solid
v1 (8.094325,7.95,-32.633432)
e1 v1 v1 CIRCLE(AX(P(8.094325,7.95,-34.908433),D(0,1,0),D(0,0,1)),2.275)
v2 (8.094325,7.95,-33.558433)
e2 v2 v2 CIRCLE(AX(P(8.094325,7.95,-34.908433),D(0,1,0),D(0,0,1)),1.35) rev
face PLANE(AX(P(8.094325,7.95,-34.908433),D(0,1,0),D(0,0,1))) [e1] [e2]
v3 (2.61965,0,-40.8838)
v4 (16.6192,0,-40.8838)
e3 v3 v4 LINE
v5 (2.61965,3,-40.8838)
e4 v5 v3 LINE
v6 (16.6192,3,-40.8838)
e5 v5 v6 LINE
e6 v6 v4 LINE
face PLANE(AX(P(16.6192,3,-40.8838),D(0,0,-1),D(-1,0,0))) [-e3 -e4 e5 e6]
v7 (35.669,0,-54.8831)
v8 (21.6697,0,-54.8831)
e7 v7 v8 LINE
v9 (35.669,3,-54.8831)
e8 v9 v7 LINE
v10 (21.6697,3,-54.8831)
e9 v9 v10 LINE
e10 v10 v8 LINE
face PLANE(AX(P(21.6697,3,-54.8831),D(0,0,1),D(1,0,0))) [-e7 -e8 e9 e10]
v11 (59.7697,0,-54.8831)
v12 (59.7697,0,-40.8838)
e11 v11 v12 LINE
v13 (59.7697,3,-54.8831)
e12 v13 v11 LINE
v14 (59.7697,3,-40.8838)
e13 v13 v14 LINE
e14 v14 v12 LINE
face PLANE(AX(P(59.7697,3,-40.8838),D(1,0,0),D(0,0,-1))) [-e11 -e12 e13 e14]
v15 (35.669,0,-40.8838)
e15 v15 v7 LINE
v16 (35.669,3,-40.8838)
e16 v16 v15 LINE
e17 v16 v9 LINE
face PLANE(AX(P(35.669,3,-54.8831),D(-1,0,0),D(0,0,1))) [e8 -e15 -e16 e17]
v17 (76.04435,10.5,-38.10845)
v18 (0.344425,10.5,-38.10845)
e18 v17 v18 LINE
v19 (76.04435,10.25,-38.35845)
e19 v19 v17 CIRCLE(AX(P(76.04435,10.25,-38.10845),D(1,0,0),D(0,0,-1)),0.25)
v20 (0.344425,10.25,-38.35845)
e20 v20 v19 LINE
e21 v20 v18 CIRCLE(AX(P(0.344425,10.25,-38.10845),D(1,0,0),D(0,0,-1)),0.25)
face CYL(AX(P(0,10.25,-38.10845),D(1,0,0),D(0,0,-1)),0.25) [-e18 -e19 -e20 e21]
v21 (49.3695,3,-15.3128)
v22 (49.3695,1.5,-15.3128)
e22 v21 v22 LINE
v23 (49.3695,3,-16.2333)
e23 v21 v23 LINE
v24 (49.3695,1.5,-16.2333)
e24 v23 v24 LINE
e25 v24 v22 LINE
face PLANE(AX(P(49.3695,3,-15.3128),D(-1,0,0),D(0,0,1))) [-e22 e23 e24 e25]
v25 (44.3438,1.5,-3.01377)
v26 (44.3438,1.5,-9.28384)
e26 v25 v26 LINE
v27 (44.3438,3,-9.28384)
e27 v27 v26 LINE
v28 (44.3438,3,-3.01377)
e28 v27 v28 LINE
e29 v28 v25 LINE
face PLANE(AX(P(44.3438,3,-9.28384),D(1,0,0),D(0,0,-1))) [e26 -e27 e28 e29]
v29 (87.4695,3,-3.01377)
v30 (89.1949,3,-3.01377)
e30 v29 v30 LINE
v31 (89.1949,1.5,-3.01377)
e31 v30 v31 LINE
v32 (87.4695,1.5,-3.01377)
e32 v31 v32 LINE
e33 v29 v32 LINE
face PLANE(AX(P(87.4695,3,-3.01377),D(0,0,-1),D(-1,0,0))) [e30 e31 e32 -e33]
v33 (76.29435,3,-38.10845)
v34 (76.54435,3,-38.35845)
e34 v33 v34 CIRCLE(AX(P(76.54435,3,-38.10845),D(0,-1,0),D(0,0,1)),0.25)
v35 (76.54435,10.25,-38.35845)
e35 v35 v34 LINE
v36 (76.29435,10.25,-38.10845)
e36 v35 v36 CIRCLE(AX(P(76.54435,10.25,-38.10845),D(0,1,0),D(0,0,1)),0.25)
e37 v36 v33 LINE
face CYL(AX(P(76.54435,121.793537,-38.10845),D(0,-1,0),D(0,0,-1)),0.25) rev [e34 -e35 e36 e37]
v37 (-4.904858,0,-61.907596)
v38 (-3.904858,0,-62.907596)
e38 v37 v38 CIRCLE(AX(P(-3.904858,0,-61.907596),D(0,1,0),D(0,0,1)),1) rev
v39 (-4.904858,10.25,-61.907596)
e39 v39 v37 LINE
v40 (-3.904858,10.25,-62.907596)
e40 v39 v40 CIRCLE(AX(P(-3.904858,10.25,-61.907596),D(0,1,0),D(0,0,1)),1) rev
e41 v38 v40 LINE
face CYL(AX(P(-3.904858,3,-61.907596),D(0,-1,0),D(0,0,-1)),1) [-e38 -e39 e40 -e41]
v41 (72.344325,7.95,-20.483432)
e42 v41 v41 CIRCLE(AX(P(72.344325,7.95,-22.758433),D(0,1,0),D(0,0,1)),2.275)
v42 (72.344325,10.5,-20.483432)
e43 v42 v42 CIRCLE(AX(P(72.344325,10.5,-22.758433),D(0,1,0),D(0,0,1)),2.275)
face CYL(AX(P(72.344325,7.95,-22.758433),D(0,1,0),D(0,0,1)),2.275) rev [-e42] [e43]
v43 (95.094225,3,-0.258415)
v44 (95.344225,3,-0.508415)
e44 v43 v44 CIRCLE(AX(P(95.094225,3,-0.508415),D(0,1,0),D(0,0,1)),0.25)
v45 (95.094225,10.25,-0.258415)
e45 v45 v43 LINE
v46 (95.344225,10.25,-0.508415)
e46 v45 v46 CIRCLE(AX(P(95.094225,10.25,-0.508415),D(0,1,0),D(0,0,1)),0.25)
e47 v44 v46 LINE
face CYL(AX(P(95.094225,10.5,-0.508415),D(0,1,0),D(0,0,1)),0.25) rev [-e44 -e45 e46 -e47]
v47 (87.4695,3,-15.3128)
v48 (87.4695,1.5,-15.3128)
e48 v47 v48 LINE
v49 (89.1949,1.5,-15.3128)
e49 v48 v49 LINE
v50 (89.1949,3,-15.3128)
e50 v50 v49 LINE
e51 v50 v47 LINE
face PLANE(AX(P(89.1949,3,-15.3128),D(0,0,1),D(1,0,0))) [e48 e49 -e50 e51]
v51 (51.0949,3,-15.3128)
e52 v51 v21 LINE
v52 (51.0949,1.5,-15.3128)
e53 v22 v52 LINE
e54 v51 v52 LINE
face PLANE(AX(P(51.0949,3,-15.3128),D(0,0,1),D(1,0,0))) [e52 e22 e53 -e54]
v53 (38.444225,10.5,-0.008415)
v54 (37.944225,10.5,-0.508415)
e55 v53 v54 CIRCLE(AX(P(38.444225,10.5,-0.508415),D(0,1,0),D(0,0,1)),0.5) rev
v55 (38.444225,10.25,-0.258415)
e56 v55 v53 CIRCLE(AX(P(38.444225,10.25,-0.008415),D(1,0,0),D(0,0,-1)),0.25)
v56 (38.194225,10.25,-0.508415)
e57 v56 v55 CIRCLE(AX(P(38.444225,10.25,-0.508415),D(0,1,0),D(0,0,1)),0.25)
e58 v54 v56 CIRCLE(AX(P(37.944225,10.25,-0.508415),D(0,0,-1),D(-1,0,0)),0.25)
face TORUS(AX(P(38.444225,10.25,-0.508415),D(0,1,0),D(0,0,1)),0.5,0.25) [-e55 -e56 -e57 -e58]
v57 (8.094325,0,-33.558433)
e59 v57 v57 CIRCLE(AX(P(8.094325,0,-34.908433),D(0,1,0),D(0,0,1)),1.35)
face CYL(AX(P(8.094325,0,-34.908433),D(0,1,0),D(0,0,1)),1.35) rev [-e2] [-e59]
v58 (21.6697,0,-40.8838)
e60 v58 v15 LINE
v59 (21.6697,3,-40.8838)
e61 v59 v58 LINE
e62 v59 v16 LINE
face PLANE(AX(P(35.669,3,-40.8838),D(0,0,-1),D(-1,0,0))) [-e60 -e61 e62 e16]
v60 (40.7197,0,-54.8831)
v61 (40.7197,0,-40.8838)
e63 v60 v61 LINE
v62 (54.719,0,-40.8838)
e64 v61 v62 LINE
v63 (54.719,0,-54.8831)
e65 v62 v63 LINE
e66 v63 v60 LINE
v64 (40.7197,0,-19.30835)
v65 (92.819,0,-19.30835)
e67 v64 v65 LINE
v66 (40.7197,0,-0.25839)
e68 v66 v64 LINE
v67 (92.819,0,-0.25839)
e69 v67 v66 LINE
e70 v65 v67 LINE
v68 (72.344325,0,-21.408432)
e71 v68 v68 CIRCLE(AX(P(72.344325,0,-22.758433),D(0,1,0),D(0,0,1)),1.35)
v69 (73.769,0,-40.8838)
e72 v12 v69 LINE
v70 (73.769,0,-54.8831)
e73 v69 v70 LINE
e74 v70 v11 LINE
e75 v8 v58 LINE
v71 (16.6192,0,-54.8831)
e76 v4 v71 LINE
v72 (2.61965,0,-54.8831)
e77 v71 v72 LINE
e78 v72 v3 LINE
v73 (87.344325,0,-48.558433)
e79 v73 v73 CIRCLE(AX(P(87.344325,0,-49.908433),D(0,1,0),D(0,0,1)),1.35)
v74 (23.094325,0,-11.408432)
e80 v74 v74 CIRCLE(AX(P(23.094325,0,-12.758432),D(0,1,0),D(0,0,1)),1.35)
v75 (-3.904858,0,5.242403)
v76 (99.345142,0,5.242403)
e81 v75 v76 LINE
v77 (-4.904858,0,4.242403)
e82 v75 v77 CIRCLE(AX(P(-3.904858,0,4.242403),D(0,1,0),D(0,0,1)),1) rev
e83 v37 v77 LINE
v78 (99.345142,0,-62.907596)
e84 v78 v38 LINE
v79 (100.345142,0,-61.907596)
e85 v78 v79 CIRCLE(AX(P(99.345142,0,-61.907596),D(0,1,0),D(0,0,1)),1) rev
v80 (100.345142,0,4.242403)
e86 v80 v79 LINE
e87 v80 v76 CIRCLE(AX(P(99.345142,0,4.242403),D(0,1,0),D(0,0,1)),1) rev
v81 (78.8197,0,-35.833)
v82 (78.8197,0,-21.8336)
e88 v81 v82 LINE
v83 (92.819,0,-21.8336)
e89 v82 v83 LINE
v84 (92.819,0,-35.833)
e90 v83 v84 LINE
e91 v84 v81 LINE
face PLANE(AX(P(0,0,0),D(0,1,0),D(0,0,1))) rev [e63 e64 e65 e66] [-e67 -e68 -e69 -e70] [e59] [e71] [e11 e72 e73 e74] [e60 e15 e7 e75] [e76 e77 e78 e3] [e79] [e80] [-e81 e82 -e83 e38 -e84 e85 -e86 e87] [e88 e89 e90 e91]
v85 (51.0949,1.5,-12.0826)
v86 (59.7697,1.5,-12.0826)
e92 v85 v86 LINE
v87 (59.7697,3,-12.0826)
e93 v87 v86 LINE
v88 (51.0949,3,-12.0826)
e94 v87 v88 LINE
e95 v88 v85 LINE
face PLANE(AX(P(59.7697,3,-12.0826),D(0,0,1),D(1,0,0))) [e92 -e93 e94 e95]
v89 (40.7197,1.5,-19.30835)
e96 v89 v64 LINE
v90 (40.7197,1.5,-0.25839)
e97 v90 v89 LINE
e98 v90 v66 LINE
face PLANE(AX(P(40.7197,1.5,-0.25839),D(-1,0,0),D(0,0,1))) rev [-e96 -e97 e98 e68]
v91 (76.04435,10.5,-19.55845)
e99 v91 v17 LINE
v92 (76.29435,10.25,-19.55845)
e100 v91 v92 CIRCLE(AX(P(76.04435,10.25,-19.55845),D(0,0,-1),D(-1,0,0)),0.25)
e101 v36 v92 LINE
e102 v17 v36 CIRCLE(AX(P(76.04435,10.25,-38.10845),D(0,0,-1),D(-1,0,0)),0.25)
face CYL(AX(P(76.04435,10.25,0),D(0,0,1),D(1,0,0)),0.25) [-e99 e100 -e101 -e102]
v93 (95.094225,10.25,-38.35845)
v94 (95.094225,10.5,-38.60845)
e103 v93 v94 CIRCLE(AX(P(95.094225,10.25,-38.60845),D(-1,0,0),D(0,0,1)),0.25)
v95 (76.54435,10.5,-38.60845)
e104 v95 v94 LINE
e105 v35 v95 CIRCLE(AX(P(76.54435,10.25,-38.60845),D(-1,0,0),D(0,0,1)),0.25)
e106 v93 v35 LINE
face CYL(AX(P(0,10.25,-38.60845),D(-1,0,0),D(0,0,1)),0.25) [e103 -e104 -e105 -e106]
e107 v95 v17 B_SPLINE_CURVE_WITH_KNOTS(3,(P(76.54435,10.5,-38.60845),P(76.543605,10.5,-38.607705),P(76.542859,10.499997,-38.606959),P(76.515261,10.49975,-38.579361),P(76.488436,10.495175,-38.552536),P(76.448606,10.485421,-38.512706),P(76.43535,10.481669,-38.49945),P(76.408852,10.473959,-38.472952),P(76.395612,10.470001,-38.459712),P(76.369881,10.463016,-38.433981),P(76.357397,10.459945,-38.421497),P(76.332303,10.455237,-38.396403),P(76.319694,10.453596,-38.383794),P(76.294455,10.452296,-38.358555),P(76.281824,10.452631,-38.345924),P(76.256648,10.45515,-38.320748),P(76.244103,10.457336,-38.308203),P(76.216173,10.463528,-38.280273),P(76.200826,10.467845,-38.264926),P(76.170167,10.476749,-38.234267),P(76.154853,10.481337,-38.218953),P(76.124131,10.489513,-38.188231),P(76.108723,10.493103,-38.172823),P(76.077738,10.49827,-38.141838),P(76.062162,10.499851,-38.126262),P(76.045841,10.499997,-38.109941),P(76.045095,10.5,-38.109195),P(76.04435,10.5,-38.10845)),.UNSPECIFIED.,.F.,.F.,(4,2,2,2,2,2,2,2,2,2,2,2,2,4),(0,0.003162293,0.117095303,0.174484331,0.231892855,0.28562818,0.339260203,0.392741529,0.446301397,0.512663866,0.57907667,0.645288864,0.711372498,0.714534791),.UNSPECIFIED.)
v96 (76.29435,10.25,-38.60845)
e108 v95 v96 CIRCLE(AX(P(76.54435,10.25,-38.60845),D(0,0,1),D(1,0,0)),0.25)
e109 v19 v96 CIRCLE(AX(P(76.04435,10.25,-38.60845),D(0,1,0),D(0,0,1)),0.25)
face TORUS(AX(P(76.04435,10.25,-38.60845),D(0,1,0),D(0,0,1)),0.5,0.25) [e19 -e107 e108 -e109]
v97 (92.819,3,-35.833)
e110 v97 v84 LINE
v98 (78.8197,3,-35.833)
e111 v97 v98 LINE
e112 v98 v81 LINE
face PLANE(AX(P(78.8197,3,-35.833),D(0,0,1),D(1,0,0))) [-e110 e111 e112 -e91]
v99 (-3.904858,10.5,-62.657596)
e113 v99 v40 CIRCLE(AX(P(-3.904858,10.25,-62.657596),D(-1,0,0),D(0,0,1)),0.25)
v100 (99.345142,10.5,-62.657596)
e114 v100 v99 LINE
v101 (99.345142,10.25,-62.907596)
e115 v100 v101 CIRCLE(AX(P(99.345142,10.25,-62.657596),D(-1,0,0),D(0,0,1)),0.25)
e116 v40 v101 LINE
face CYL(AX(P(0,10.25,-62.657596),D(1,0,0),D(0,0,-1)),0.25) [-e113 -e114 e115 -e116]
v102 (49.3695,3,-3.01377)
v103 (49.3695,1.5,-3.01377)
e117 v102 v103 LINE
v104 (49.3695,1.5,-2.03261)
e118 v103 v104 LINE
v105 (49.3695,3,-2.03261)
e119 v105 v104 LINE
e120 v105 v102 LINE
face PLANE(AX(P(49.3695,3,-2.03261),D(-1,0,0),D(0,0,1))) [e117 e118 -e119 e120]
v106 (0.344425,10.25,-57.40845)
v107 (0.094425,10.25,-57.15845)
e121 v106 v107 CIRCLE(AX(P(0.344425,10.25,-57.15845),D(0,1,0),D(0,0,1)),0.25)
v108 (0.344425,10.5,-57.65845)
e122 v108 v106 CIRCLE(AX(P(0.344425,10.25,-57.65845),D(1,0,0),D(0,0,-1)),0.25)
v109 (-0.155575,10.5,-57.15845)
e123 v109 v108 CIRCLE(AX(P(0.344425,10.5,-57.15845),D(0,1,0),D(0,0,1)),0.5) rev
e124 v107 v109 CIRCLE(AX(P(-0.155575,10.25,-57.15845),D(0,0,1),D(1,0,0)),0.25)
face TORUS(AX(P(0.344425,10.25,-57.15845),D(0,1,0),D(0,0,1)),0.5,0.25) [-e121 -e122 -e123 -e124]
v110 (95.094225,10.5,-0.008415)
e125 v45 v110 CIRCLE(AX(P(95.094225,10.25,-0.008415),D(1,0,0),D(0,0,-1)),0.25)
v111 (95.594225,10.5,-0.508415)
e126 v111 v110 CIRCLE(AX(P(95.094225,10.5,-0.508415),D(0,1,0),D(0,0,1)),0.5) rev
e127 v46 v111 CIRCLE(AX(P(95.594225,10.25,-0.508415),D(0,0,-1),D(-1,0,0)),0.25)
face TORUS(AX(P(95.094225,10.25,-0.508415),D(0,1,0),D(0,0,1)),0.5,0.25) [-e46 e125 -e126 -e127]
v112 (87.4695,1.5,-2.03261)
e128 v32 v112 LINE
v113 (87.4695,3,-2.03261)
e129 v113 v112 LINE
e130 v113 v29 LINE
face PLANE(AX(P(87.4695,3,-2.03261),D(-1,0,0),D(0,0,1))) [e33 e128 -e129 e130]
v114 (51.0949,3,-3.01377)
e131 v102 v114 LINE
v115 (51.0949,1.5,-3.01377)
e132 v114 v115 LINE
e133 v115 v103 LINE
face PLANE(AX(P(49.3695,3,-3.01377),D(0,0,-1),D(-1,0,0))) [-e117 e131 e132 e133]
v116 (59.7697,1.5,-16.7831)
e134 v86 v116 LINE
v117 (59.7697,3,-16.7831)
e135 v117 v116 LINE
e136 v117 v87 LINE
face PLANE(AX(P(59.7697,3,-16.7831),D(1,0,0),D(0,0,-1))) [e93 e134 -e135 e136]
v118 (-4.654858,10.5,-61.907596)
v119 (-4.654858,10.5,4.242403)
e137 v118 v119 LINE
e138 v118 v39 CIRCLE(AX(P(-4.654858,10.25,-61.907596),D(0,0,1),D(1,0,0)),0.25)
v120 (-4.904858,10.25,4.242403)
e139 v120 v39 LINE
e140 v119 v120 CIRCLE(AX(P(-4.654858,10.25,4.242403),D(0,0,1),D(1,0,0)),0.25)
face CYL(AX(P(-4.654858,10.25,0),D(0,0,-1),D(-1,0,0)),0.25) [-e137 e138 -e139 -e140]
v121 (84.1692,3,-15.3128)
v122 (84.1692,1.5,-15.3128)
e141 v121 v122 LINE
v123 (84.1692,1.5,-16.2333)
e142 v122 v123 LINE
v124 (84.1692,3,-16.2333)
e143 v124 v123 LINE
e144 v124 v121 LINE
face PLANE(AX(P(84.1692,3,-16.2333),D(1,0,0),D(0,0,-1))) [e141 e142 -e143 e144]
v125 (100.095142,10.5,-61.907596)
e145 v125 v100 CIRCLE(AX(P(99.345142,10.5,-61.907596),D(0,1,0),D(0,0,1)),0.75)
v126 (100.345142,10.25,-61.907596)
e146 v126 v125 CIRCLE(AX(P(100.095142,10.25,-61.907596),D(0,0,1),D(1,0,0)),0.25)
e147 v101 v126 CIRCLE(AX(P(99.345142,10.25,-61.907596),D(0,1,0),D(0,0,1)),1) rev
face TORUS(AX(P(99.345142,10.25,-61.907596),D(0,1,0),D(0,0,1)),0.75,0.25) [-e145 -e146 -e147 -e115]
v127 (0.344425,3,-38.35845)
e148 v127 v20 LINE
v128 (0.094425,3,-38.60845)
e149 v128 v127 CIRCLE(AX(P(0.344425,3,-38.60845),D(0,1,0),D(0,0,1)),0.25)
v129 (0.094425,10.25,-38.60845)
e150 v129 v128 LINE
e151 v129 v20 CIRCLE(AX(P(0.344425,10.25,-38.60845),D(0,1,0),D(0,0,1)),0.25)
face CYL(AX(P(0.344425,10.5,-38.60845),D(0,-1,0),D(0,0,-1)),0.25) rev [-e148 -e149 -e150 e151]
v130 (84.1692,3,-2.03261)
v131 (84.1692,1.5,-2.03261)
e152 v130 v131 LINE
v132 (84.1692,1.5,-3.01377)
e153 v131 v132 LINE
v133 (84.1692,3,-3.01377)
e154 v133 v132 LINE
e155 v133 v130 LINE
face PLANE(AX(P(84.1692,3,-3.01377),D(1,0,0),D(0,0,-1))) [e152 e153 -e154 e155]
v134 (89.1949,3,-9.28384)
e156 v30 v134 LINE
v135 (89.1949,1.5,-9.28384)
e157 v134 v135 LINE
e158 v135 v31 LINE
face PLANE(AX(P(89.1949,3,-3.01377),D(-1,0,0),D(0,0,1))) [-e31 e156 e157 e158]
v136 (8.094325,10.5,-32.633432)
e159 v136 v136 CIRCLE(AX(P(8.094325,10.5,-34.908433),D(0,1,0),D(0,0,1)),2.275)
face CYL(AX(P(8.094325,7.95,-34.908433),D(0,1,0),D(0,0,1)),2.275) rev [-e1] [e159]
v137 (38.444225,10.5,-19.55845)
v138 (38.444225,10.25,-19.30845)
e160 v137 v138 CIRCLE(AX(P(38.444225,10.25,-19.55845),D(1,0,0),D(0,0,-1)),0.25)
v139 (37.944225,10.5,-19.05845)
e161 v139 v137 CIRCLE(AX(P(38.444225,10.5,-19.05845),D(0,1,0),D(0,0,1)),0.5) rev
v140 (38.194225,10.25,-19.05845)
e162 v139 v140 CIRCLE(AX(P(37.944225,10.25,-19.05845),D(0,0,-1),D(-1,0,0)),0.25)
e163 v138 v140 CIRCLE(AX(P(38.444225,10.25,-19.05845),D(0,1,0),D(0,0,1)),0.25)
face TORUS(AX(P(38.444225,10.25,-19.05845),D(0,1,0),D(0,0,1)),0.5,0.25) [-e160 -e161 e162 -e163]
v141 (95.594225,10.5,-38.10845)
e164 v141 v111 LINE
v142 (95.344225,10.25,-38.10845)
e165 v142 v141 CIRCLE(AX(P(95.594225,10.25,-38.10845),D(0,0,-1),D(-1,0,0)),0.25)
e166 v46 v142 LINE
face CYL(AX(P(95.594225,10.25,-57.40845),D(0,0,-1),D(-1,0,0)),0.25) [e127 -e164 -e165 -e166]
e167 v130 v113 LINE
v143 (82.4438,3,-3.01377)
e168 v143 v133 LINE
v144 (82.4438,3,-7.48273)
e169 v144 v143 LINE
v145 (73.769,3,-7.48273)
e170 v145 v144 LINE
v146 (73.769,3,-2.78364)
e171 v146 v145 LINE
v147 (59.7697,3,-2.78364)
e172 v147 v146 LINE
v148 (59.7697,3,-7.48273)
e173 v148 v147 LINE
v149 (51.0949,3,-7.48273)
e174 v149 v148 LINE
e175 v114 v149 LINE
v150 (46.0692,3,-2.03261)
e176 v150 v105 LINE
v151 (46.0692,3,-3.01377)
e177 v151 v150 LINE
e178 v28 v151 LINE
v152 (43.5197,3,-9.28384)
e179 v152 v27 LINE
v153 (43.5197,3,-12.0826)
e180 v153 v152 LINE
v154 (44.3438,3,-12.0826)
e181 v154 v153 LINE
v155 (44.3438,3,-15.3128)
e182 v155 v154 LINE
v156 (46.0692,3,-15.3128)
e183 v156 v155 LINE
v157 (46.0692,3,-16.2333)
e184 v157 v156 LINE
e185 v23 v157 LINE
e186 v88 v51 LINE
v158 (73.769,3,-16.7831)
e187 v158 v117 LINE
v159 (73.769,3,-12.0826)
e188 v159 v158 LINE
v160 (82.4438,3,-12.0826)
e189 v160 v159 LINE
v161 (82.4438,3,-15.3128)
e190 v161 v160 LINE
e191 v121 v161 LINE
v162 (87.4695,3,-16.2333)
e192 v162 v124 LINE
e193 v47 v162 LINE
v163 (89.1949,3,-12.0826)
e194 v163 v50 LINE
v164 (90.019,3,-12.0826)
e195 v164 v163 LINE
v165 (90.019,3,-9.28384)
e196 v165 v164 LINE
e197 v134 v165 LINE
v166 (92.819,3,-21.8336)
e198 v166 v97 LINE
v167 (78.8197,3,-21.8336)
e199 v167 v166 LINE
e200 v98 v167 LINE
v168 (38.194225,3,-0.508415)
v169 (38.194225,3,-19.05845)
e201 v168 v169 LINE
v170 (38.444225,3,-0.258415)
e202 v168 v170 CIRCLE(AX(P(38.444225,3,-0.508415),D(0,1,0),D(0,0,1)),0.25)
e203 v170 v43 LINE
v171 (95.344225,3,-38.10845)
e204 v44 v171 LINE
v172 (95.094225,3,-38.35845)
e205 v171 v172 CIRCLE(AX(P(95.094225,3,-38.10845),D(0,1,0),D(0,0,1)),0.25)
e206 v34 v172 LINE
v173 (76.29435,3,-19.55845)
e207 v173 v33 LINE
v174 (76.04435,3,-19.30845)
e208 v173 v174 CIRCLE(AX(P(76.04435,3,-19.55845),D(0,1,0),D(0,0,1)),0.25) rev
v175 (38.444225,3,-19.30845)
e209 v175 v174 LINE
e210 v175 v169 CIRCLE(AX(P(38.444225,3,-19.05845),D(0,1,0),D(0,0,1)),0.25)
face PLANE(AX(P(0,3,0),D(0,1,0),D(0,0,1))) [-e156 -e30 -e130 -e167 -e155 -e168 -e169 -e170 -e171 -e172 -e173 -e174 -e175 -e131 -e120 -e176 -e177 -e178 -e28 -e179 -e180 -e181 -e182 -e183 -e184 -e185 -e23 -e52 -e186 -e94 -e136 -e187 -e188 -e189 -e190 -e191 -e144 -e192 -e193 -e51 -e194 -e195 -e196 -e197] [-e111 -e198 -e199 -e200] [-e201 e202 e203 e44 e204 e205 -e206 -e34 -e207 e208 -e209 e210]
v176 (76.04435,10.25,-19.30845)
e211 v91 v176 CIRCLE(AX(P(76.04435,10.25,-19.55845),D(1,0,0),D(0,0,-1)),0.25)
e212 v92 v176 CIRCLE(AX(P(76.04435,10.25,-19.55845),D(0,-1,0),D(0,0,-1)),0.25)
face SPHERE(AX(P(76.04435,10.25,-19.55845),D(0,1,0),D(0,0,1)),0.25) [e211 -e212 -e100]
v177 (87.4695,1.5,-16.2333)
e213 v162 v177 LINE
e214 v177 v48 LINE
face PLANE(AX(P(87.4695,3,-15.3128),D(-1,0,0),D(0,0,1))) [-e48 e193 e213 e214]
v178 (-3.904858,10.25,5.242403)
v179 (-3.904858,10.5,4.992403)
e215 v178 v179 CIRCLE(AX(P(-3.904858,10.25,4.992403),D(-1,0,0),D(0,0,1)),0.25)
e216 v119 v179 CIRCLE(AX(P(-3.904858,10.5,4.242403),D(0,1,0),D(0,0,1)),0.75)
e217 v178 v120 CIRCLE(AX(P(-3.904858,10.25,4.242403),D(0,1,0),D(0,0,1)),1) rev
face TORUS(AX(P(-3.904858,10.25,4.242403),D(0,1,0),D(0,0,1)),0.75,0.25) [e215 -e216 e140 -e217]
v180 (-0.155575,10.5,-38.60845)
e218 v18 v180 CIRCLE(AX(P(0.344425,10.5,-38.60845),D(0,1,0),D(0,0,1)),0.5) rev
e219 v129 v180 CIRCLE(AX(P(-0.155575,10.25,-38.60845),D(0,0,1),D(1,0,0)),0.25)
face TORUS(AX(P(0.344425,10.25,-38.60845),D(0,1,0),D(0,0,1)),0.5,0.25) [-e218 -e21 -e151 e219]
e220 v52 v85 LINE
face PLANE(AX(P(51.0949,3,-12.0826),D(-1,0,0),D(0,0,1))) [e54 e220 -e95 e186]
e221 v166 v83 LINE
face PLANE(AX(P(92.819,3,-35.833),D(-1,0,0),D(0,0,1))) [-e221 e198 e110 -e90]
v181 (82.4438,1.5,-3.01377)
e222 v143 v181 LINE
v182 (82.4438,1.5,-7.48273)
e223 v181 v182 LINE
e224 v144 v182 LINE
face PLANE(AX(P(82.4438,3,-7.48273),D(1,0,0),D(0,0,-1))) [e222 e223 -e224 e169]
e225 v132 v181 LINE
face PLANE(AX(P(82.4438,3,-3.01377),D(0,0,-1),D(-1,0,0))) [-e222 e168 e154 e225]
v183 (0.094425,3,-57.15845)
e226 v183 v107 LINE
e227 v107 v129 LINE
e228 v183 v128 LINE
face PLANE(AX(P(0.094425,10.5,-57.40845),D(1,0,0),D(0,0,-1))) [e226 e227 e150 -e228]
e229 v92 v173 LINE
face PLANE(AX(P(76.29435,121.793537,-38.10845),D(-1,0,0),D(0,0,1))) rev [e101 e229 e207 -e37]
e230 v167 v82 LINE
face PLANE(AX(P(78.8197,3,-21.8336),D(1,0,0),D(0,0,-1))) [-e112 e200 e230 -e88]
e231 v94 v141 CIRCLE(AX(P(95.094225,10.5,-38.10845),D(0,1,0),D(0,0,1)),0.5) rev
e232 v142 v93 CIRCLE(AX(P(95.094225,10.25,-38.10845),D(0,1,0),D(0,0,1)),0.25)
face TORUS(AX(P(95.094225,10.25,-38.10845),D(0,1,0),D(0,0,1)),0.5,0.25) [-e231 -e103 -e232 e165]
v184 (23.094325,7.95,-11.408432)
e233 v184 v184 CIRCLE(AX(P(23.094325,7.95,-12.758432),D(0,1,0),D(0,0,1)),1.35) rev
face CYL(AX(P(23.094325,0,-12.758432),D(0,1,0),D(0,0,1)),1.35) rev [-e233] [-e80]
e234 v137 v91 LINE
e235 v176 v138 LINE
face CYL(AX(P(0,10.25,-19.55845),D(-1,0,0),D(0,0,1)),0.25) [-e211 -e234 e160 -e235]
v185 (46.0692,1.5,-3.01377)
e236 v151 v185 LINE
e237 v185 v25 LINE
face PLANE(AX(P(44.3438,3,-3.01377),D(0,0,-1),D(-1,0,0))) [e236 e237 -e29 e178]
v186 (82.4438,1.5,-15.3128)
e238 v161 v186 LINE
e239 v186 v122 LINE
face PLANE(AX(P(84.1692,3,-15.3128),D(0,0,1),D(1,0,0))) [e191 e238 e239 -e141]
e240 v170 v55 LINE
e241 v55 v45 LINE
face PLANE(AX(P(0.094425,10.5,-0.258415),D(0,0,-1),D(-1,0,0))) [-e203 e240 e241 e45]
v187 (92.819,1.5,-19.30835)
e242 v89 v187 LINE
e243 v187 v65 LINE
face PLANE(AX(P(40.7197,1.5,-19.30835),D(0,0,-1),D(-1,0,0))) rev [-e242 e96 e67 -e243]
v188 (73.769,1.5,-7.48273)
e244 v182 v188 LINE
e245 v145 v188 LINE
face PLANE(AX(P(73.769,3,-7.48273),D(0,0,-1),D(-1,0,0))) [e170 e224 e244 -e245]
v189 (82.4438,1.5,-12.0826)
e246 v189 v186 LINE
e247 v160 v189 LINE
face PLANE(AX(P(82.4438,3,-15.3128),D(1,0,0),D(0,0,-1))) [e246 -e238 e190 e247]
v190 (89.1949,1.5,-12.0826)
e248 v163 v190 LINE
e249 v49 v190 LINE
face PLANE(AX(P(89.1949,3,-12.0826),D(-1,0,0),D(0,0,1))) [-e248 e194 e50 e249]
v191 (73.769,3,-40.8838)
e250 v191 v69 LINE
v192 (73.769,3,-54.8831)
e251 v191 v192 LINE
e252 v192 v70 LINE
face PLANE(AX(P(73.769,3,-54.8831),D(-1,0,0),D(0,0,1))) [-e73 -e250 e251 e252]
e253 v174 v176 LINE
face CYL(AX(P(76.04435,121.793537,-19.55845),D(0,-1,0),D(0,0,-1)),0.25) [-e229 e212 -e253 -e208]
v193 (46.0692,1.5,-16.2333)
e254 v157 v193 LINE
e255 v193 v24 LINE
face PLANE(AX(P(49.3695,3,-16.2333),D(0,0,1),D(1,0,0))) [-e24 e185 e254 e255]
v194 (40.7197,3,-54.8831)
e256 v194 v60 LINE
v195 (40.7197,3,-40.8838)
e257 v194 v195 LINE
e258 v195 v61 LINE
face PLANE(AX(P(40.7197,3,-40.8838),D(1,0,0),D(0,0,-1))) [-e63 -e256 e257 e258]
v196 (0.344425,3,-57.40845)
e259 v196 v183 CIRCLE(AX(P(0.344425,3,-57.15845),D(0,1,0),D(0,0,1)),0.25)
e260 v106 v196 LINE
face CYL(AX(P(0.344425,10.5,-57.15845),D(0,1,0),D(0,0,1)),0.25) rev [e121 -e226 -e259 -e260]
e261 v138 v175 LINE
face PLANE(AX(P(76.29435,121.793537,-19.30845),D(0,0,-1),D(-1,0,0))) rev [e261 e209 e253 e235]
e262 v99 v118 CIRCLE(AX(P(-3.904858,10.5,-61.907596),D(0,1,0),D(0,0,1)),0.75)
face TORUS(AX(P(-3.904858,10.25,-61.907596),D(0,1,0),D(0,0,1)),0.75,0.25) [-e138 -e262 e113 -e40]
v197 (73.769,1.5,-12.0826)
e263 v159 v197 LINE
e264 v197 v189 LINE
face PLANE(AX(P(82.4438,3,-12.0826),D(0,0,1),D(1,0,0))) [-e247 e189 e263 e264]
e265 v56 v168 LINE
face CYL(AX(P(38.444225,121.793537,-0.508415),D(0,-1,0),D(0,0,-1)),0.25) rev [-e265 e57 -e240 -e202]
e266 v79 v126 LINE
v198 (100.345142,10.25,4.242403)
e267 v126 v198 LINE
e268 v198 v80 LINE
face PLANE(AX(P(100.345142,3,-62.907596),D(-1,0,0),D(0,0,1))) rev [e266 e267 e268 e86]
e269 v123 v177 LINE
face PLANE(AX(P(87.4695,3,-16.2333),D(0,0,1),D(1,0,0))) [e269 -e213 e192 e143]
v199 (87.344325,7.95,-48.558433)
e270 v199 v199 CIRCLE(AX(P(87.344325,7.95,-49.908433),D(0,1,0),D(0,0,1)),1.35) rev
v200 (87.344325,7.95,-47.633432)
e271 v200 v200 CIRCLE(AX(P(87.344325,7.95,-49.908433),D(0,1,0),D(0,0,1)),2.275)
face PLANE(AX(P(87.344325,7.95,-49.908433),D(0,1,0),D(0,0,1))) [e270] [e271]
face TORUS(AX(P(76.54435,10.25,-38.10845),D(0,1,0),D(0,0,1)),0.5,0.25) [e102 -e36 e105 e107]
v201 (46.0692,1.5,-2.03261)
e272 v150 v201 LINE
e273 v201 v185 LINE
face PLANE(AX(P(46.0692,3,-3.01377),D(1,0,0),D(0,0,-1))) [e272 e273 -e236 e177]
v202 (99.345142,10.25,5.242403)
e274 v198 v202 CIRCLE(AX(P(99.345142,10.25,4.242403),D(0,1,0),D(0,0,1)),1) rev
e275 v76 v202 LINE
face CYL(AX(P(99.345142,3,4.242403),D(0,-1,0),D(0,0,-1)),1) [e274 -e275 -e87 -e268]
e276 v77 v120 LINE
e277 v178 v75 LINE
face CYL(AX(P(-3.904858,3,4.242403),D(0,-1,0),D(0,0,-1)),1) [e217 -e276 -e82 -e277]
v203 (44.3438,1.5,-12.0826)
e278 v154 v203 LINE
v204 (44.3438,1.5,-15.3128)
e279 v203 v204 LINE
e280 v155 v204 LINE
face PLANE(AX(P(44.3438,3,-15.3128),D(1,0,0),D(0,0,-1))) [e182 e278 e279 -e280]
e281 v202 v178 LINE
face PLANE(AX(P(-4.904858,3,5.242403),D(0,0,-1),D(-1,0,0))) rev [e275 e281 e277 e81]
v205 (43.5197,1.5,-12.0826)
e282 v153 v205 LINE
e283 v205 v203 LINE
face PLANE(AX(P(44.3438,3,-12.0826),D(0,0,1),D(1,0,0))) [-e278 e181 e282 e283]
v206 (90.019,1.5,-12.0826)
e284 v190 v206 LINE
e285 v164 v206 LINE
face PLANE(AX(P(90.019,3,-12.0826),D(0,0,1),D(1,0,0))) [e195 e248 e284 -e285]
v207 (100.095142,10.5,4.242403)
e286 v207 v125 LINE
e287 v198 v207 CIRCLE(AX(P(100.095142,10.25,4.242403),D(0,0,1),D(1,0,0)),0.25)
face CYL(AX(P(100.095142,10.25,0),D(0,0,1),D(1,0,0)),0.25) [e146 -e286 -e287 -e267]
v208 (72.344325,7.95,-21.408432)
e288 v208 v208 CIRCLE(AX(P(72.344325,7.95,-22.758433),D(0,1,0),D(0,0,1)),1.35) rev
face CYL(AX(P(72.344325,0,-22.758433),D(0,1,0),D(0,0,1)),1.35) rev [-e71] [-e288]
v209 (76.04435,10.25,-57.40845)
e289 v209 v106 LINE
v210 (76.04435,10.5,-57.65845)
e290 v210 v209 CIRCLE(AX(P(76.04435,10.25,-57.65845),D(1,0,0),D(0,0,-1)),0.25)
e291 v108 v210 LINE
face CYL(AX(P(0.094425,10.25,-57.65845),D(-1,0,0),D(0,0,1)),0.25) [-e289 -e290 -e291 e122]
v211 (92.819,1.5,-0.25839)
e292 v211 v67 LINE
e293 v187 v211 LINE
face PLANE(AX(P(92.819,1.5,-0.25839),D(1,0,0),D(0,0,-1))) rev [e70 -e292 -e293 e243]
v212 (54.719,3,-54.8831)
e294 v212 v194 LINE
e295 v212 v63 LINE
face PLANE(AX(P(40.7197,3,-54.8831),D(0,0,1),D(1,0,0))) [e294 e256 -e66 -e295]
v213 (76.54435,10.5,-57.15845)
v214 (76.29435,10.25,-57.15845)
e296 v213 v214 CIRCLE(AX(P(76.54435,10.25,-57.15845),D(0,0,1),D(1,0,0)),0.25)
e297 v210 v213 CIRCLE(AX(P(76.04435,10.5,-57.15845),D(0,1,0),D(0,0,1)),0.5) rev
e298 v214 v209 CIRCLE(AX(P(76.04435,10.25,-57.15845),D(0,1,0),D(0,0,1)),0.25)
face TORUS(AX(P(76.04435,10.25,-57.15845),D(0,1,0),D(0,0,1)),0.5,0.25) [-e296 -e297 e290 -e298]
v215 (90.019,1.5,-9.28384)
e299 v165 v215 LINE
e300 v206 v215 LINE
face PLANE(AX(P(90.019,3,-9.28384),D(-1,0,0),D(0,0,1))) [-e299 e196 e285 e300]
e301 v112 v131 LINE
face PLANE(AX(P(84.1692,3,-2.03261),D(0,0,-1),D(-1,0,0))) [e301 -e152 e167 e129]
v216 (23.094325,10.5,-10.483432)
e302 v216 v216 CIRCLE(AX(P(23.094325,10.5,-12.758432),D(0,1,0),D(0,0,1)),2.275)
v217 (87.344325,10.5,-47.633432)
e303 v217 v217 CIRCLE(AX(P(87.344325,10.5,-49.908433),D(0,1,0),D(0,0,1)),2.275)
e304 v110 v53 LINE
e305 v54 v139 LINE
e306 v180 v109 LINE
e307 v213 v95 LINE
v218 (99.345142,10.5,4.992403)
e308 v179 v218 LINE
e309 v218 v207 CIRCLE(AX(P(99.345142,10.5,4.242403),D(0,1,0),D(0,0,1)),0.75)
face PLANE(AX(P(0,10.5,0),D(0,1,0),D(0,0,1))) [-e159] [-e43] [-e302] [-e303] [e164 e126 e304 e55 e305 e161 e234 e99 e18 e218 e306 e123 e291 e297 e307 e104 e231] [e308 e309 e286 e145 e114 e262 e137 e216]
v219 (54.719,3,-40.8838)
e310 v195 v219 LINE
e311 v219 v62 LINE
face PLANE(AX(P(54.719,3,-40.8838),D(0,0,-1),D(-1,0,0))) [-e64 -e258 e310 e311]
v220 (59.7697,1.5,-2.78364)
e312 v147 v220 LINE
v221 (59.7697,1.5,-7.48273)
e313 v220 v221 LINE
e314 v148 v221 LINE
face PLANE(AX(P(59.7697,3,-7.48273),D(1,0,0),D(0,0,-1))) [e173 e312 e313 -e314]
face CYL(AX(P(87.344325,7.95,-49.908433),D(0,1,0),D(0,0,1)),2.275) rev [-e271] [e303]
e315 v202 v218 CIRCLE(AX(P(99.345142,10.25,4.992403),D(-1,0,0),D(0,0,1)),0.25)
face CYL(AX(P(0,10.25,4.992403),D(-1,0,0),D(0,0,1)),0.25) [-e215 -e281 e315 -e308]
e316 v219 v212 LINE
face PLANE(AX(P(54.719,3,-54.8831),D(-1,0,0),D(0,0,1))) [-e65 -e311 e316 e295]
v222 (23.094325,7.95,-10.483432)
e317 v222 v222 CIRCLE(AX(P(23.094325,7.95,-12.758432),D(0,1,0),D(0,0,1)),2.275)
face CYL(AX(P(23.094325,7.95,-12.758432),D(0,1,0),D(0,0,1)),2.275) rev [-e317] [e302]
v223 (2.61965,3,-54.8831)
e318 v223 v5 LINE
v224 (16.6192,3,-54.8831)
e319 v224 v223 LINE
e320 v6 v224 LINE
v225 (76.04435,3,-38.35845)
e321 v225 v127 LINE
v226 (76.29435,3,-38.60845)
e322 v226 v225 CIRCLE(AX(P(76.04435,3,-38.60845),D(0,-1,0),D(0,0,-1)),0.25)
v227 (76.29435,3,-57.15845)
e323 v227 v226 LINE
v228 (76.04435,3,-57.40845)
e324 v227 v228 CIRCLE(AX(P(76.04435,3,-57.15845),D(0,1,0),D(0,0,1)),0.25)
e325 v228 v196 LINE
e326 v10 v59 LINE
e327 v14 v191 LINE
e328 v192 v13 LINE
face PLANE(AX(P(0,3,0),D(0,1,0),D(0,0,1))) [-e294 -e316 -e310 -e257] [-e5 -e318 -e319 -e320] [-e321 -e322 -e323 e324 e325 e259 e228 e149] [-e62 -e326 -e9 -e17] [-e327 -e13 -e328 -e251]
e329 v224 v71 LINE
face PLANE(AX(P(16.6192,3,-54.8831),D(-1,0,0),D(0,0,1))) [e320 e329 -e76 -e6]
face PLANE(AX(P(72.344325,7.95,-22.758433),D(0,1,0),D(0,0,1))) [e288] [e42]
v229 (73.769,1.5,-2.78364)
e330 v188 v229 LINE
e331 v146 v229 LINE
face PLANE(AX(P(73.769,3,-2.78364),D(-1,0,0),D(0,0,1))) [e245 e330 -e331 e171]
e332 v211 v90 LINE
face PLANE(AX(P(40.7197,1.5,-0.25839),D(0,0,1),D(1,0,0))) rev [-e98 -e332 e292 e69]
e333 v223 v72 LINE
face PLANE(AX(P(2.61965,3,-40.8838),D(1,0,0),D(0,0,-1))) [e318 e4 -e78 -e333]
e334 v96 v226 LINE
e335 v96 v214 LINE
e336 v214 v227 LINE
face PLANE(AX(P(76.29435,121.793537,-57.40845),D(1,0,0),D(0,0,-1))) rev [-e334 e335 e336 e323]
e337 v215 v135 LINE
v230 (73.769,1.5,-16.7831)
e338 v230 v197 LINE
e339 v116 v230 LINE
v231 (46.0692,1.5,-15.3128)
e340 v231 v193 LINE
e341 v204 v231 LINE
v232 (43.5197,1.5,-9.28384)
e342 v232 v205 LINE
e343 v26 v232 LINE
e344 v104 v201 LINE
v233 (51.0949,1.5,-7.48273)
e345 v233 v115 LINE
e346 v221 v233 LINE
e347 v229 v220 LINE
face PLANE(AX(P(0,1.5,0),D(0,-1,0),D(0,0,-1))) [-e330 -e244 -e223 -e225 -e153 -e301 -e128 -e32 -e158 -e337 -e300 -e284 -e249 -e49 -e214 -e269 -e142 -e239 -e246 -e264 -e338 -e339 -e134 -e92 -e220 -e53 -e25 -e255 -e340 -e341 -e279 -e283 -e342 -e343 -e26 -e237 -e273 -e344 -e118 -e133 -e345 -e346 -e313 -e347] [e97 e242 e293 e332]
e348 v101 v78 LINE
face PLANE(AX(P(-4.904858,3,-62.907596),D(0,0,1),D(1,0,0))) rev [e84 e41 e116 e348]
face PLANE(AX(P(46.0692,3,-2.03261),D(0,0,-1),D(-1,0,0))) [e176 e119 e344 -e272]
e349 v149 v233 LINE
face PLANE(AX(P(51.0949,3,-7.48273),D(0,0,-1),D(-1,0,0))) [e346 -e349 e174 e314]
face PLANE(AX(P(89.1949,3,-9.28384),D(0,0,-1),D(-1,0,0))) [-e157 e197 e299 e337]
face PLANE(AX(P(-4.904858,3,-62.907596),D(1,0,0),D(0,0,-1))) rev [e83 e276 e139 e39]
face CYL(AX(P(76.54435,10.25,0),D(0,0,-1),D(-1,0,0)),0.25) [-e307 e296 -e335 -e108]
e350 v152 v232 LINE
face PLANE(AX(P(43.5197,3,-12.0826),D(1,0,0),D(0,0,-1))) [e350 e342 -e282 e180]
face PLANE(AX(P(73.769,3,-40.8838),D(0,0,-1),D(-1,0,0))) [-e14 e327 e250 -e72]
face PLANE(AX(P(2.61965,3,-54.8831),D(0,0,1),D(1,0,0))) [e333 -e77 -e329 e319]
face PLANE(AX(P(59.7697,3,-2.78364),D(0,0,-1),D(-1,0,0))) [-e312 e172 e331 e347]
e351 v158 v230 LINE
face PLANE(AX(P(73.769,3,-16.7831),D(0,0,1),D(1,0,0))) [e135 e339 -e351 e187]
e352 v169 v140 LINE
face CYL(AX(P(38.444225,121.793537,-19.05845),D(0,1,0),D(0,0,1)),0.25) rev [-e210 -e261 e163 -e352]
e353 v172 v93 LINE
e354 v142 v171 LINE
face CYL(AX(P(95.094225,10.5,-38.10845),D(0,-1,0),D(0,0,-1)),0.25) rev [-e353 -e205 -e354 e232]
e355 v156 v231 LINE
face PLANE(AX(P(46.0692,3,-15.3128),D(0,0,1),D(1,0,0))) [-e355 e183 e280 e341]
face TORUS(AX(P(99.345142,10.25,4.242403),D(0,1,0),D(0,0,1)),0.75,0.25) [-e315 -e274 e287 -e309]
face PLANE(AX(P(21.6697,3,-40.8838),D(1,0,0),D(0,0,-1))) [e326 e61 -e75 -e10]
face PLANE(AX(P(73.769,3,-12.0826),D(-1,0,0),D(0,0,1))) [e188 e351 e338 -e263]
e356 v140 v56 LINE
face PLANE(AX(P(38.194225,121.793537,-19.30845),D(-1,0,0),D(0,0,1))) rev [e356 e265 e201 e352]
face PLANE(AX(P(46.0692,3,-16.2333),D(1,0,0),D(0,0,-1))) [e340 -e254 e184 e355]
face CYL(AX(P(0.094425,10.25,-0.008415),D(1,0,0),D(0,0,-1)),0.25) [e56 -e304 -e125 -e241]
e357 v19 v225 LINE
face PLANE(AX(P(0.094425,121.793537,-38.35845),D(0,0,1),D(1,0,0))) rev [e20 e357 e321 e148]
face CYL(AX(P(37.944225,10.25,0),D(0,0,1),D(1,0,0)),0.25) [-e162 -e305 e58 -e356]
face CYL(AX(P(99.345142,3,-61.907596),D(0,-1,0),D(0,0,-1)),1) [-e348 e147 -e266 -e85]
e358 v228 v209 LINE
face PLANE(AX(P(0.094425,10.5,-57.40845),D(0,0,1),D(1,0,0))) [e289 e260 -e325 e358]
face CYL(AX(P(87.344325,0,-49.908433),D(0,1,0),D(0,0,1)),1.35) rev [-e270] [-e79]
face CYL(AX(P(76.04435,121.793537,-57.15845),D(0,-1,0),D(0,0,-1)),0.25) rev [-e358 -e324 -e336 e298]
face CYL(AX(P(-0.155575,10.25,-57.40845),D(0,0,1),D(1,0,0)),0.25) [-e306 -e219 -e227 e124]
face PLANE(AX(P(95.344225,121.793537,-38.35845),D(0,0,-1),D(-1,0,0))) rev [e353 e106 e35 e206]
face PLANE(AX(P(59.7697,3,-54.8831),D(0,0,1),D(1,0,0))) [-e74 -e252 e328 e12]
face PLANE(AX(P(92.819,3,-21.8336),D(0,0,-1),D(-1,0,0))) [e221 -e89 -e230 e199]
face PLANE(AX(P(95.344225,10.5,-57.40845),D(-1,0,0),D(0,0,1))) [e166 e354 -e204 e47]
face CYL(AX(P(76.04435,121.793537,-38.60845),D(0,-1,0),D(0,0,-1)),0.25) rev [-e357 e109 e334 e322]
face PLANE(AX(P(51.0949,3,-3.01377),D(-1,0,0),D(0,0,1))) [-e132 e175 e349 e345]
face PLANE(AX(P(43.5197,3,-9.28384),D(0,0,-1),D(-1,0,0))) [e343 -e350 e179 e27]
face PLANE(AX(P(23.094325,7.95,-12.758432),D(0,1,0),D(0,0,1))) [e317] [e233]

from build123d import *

# Parameters (mm, degrees)
SKETCH5_W           = 105.25
SKETCH5_H           = 68.15
SKETCH5_W_2         = 13.9993
SKETCH5_H_2         = 13.9994
SKETCH5_H_3         = 13.9993
SKETCH5_W_3         = 13.99955
BOSS_EXTRUDE1_DEPTH = 3
SKETCH6_W           = 52.0993
SKETCH6_H           = 19.04996
CUT_EXTRUDE1_DEPTH  = 1.5
SKETCH7_W           = 105.25
SKETCH7_H           = 68.15
SKETCH7_W_2         = 95.2498
SKETCH7_H_2         = 57.150035
BOSS_EXTRUDE2_DEPTH = 7.5
SKETCH9_R           = 1.35
CUT_EXTRUDE3_DEPTH  = 119.670818994
BOSS_EXTRUDE4_START = 7.5
SKETCH10_R          = 1.35
BOSS_EXTRUDE4_DEPTH = 7.5
SKETCH13_R          = 2.275
CUT_EXTRUDE5_DEPTH  = 2.55
FILLET1_R           = 0.25
FILLET2_R           = 1
FILLET3_R           = 0.25


with BuildPart() as part:
    # Sketch5 → Boss-Extrude1 (new body)
    with BuildSketch(Plane(origin=(0, 0, 0), x_dir=(1, 0, 0), z_dir=(0, 1, 0))):
        with Locations((47.7201423, 28.8325965)):
            Rectangle(SKETCH5_W, SKETCH5_H)
        Polygon((82.4438, 7.48273), (82.4438, 3.01377), (84.1692, 3.01377), (84.1692, 2.03261), (87.4695, 2.03261), (87.4695, 3.01377), (89.1949, 3.01377), (89.1949, 9.28384), (90.019, 9.28384), (90.019, 12.0826), (89.1949, 12.0826), (89.1949, 15.3128), (87.4695, 15.3128), (87.4695, 16.2333), (84.1692, 16.2333), (84.1692, 15.3128), (82.4438, 15.3128), (82.4438, 12.0826), (73.769, 12.0826), (73.769, 16.7831), (59.7697, 16.7831), (59.7697, 12.0826), (51.0949, 12.0826), (51.0949, 15.3128), (49.3695, 15.3128), (49.3695, 16.2333), (46.0692, 16.2333), (46.0692, 15.3128), (44.3438, 15.3128), (44.3438, 12.0826), (43.5197, 12.0826), (43.5197, 9.28384), (44.3438, 9.28384), (44.3438, 3.01377), (46.0692, 3.01377), (46.0692, 2.03261), (49.3695, 2.03261), (49.3695, 3.01377), (51.0949, 3.01377), (51.0949, 7.48273), (59.7697, 7.48273), (59.7697, 2.78364), (73.769, 2.78364), (73.769, 7.48273), align=None, mode=Mode.SUBTRACT)
        with Locations((85.81935, 28.8333)):
            Rectangle(SKETCH5_W_2, SKETCH5_H_2, mode=Mode.SUBTRACT)
        with Locations((66.76935, 47.88345)):
            Rectangle(SKETCH5_W_2, SKETCH5_H_3, mode=Mode.SUBTRACT)
        with Locations((47.71935, 47.88345)):
            Rectangle(SKETCH5_W_2, SKETCH5_H_3, mode=Mode.SUBTRACT)
        with Locations((28.66935, 47.88345)):
            Rectangle(SKETCH5_W_2, SKETCH5_H_3, mode=Mode.SUBTRACT)
        with Locations((9.619425, 47.88345)):
            Rectangle(SKETCH5_W_3, SKETCH5_H_3, mode=Mode.SUBTRACT)
    extrude(amount=BOSS_EXTRUDE1_DEPTH)

    # Sketch6 → Cut-Extrude1 (cut)
    with BuildSketch(Plane.XZ):
        with Locations((66.76935, -9.78337)):
            Rectangle(SKETCH6_W, SKETCH6_H)
    extrude(amount=-CUT_EXTRUDE1_DEPTH, mode=Mode.SUBTRACT)

    # Sketch7 → Boss-Extrude2 (add)
    with BuildSketch(Plane(origin=(0, 3, 0), x_dir=(1, 0, 0), z_dir=(0, 1, 0))):
        with Locations((47.7201423, 28.8325965)):
            Rectangle(SKETCH7_W, SKETCH7_H)
        with Locations((47.719325, 28.8334325)):
            Rectangle(SKETCH7_W_2, SKETCH7_H_2, mode=Mode.SUBTRACT)
    extrude(amount=BOSS_EXTRUDE2_DEPTH)

    # Sketch9 → Cut-Extrude3 (cut, through all)
    with BuildSketch(Plane(origin=(0, 3, 0), x_dir=(1, 0, 0), z_dir=(0, 1, 0))):
        with Locations(Location((8.094325, 34.9084325, 0), (0, 0, 270))):
            Circle(SKETCH9_R)
        with Locations(Location((23.094325, 12.7584325, 0), (0, 0, 270))):
            Circle(SKETCH9_R)
        with Locations(Location((87.344325, 49.9084325, 0), (0, 0, 270))):
            Circle(SKETCH9_R)
        with Locations(Location((72.344325, 22.7584325, 0), (0, 0, 270))):
            Circle(SKETCH9_R)
    extrude(amount=-CUT_EXTRUDE3_DEPTH, mode=Mode.SUBTRACT)

    # Sketch10 → Boss-Extrude4 (add)
    with BuildSketch(Plane(origin=(0, 3, 0), x_dir=(1, 0, 0), z_dir=(0, 1, 0)).offset(BOSS_EXTRUDE4_START)):
        with BuildLine():
            Line((76.29435, 57.40845), (76.29435, 38.60845))
            ThreePointArc((76.29435, 38.60845), (76.221126695, 38.431673305), (76.04435, 38.35845))
            Line((76.04435, 38.35845), (0.094425, 38.35845))
            Line((0.094425, 38.35845), (0, 0))
            Line((0, 0), (38.194225, 0.258415))
            Line((38.194225, 0.258415), (38.194225, 19.30845))
            Line((38.194225, 19.30845), (76.29435, 19.30845))
            Line((76.29435, 19.30845), (76.29435, 38.10845))
            ThreePointArc((76.29435, 38.10845), (76.367573305, 38.285226695), (76.54435, 38.35845))
            Line((76.54435, 38.35845), (95.344225, 38.35845))
            Line((95.344225, 38.35845), (95.344225, 57.40845))
            Line((95.344225, 57.40845), (76.29435, 57.40845))
        make_face()
        with Locations(Location((72.344325, 22.7584325, 0), (0, 0, 270))):
            Circle(SKETCH10_R, mode=Mode.SUBTRACT)
        with Locations(Location((23.094325, 12.7584325, 0), (0, 0, 270))):
            Circle(SKETCH10_R, mode=Mode.SUBTRACT)
        with Locations(Location((8.094325, 34.9084325, 0), (0, 0, 270))):
            Circle(SKETCH10_R, mode=Mode.SUBTRACT)
        with Locations(Location((87.344325, 49.9084325, 0), (0, 0, 270))):
            Circle(SKETCH10_R, mode=Mode.SUBTRACT)
    extrude(amount=-BOSS_EXTRUDE4_DEPTH)

    # Sketch13 → Cut-Extrude5 (cut)
    with BuildSketch(Plane(origin=(0, 10.5, 0), x_dir=(1, 0, 0), z_dir=(0, 1, 0))):
        with Locations(Location((8.094325, 34.9084325, 0), (0, 0, 270))):
            Circle(SKETCH13_R)
        with Locations(Location((23.094325, 12.7584325, 0), (0, 0, 270))):
            Circle(SKETCH13_R)
        with Locations(Location((87.344325, 49.9084325, 0), (0, 0, 270))):
            Circle(SKETCH13_R)
        with Locations(Location((72.344325, 22.7584325, 0), (0, 0, 270))):
            Circle(SKETCH13_R)
    extrude(amount=-CUT_EXTRUDE5_DEPTH, mode=Mode.SUBTRACT)

    # Fillet1
    fillet1_edges = [part.edges().sort_by_distance(p)[0] for p in [
        (95.344225, 6.75, -0.258415),
        (0.094425, 6.75, -57.40845),
        (76.29435, 6.75, -57.40845),
        (95.344225, 6.75, -38.35845),
        (76.29435, 6.75, -19.30845),
        (38.194225, 6.75, -19.30845),
        (38.194225, 6.75, -0.258415),
        (0.094425, 6.75, -38.35845),
    ]]
    fillet(fillet1_edges, radius=FILLET1_R)

    # Fillet2
    fillet2_edges = [part.edges().sort_by_distance(p)[0] for p in [
        (-4.9048577, 5.25, -62.9075965),
        (100.3451423, 5.25, -62.9075965),
        (100.3451423, 5.25, 5.2424035),
        (-4.9048577, 5.25, 5.2424035),
    ]]
    fillet(fillet2_edges, radius=FILLET2_R)

    # Fillet3
    # the kernel refuses this fillet: 0.25 mm, written as the material it takes off along each edge
    with BuildSketch(Plane(origin=(76.04435, 10.5, -38.35845), x_dir=(0, 0, 1), z_dir=(-1, 0, 0)), Plane(origin=(0.344425, 10.5, -57.40845), x_dir=(0, 0, -1), z_dir=(1, 0, 0))) as fillet3_piece_1:
        with BuildLine():
            CenterArc((FILLET3_R, -FILLET3_R), FILLET3_R, 90, 90)
            Line((0, -FILLET3_R), (0, 0))
            Line((0, 0), (FILLET3_R, 0))
        make_face()
    extrude(amount=75.699925, mode=Mode.SUBTRACT)
    with BuildSketch(Plane(origin=(76.54435, 10.5, -38.10845), x_dir=(-1, 0, 0), z_dir=(0, 0, 1))) as fillet3_piece_2:
        with BuildLine():
            CenterArc((0.25 + FILLET3_R, FILLET3_R), FILLET3_R, 180, 90)
            Line((0.25, FILLET3_R), (0.25, 0))
            Line((0.25, 0), (0.25 + FILLET3_R, 0))
        make_face()
    revolve(axis=Axis((76.54435, 10.5, -38.10845), (0, -1, 0)), revolution_arc=90, mode=Mode.SUBTRACT)
    with BuildSketch(Plane(origin=(76.54435, 10.5, -38.35845), x_dir=(0, 0, -1), z_dir=(1, 0, 0))) as fillet3_piece_3:
        with BuildLine():
            CenterArc((FILLET3_R, -FILLET3_R), FILLET3_R, 90, 90)
            Line((0, -FILLET3_R), (0, 0))
            Line((0, 0), (FILLET3_R, 0))
        make_face()
    extrude(amount=18.549875, mode=Mode.SUBTRACT)
    with BuildSketch(Plane(origin=(76.04435, 10.5, -38.60845), x_dir=(1, 0, 0), z_dir=(0, 0, -1))) as fillet3_piece_4:
        with BuildLine():
            CenterArc((0.25 + FILLET3_R, FILLET3_R), FILLET3_R, 180, 90)
            Line((0.25, FILLET3_R), (0.25, 0))
            Line((0.25, 0), (0.25 + FILLET3_R, 0))
        make_face()
    revolve(axis=Axis((76.04435, 10.5, -38.60845), (0, -1, 0)), revolution_arc=90, mode=Mode.SUBTRACT)
    with BuildSketch(Plane(origin=(0.094425, 10.5, -38.60845), x_dir=(-1, 0, 0), z_dir=(0, 0, -1)), Plane(origin=(76.29435, 10.5, -57.15845), x_dir=(1, 0, 0), z_dir=(0, 0, 1)), Plane(origin=(76.29435, 10.5, -19.55845), x_dir=(-1, 0, 0), z_dir=(0, 0, -1))) as fillet3_piece_5:
        with BuildLine():
            CenterArc((FILLET3_R, -FILLET3_R), FILLET3_R, 90, 90)
            Line((0, -FILLET3_R), (0, 0))
            Line((0, 0), (FILLET3_R, 0))
        make_face()
    extrude(amount=18.55, mode=Mode.SUBTRACT)
    with BuildSketch(Plane(origin=(38.444225, 10.5, -19.30845), x_dir=(0, 0, -1), z_dir=(1, 0, 0))) as fillet3_piece_6:
        with BuildLine():
            CenterArc((FILLET3_R, -FILLET3_R), FILLET3_R, 90, 90)
            Line((0, -FILLET3_R), (0, 0))
            Line((0, 0), (FILLET3_R, 0))
        make_face()
    extrude(amount=37.600125, mode=Mode.SUBTRACT)
    with BuildSketch(Plane(origin=(38.194225, 10.5, -0.508415), x_dir=(-1, 0, 0), z_dir=(0, 0, -1))) as fillet3_piece_7:
        with BuildLine():
            CenterArc((FILLET3_R, -FILLET3_R), FILLET3_R, 90, 90)
            Line((0, -FILLET3_R), (0, 0))
            Line((0, 0), (FILLET3_R, 0))
        make_face()
    extrude(amount=18.550035, mode=Mode.SUBTRACT)
    with BuildSketch(Plane(origin=(95.094225, 10.5, -0.258415), x_dir=(0, 0, 1), z_dir=(-1, 0, 0))) as fillet3_piece_8:
        with BuildLine():
            CenterArc((FILLET3_R, -FILLET3_R), FILLET3_R, 90, 90)
            Line((0, -FILLET3_R), (0, 0))
            Line((0, 0), (FILLET3_R, 0))
        make_face()
    extrude(amount=56.65, mode=Mode.SUBTRACT)
    with BuildSketch(Plane(origin=(95.344225, 10.5, -38.10845), x_dir=(1, 0, 0), z_dir=(0, 0, 1))) as fillet3_piece_9:
        with BuildLine():
            CenterArc((FILLET3_R, -FILLET3_R), FILLET3_R, 90, 90)
            Line((0, -FILLET3_R), (0, 0))
            Line((0, 0), (FILLET3_R, 0))
        make_face()
    extrude(amount=37.600035, mode=Mode.SUBTRACT)
    with BuildSketch(Plane(origin=(76.04435, 10.5, -19.55845), x_dir=(0, 0, 1), z_dir=(-1, 0, 0))) as fillet3_piece_10:
        with BuildLine():
            CenterArc((0.25 - FILLET3_R, -FILLET3_R), FILLET3_R, 0, 90)
            Line((0.25, -FILLET3_R), (0.25, 0))
            Line((0.25, 0), (0.25 - FILLET3_R, 0))
        make_face()
    revolve(axis=Axis((76.04435, 10.5, -19.55845), (0, 1, 0)), revolution_arc=90, mode=Mode.SUBTRACT)
    with BuildSketch(Plane(origin=(0.344425, 10.5, -38.60845), x_dir=(-1, 0, 0), z_dir=(0, 0, -1))) as fillet3_piece_11:
        with BuildLine():
            CenterArc((0.25 + FILLET3_R, -FILLET3_R), FILLET3_R, 90, 90)
            Line((0.25, -FILLET3_R), (0.25, 0))
            Line((0.25, 0), (0.25 + FILLET3_R, 0))
        make_face()
    revolve(axis=Axis((0.344425, 10.5, -38.60845), (0, 1, 0)), revolution_arc=90, mode=Mode.SUBTRACT)
    with BuildSketch(Plane(origin=(76.04435, 10.5, -57.15845), x_dir=(0, 0, -1), z_dir=(-1, 0, 0))) as fillet3_piece_12:
        with BuildLine():
            CenterArc((0.25 + FILLET3_R, FILLET3_R), FILLET3_R, 180, 90)
            Line((0.25, FILLET3_R), (0.25, 0))
            Line((0.25, 0), (0.25 + FILLET3_R, 0))
        make_face()
    revolve(axis=Axis((76.04435, 10.5, -57.15845), (0, -1, 0)), revolution_arc=90, mode=Mode.SUBTRACT)
    with BuildSketch(Plane(origin=(0.344425, 10.5, -57.15845), x_dir=(-1, 0, 0), z_dir=(0, 0, 1))) as fillet3_piece_13:
        with BuildLine():
            CenterArc((0.25 + FILLET3_R, FILLET3_R), FILLET3_R, 180, 90)
            Line((0.25, FILLET3_R), (0.25, 0))
            Line((0.25, 0), (0.25 + FILLET3_R, 0))
        make_face()
    revolve(axis=Axis((0.344425, 10.5, -57.15845), (0, -1, 0)), revolution_arc=90, mode=Mode.SUBTRACT)
    with BuildSketch(Plane(origin=(38.444225, 10.5, -19.05845), x_dir=(-1, 0, 0), z_dir=(0, 0, 1))) as fillet3_piece_14:
        with BuildLine():
            CenterArc((0.25 + FILLET3_R, FILLET3_R), FILLET3_R, 180, 90)
            Line((0.25, FILLET3_R), (0.25, 0))
            Line((0.25, 0), (0.25 + FILLET3_R, 0))
        make_face()
    revolve(axis=Axis((38.444225, 10.5, -19.05845), (0, -1, 0)), revolution_arc=90, mode=Mode.SUBTRACT)
    with BuildSketch(Plane(origin=(38.444225, 10.5, -0.508415), x_dir=(0, 0, 1), z_dir=(1, 0, 0))) as fillet3_piece_15:
        with BuildLine():
            CenterArc((0.25 + FILLET3_R, FILLET3_R), FILLET3_R, 180, 90)
            Line((0.25, FILLET3_R), (0.25, 0))
            Line((0.25, 0), (0.25 + FILLET3_R, 0))
        make_face()
    revolve(axis=Axis((38.444225, 10.5, -0.508415), (0, -1, 0)), revolution_arc=90, mode=Mode.SUBTRACT)
    with BuildSketch(Plane(origin=(95.094225, 10.5, -0.508415), x_dir=(0, 0, 1), z_dir=(-1, 0, 0))) as fillet3_piece_16:
        with BuildLine():
            CenterArc((0.25 + FILLET3_R, -FILLET3_R), FILLET3_R, 90, 90)
            Line((0.25, -FILLET3_R), (0.25, 0))
            Line((0.25, 0), (0.25 + FILLET3_R, 0))
        make_face()
    revolve(axis=Axis((95.094225, 10.5, -0.508415), (0, 1, 0)), revolution_arc=90, mode=Mode.SUBTRACT)
    with BuildSketch(Plane(origin=(95.094225, 10.5, -38.10845), x_dir=(1, 0, 0), z_dir=(0, 0, 1))) as fillet3_piece_17:
        with BuildLine():
            CenterArc((0.25 + FILLET3_R, -FILLET3_R), FILLET3_R, 90, 90)
            Line((0.25, -FILLET3_R), (0.25, 0))
            Line((0.25, 0), (0.25 + FILLET3_R, 0))
        make_face()
    revolve(axis=Axis((95.094225, 10.5, -38.10845), (0, 1, 0)), revolution_arc=90, mode=Mode.SUBTRACT)
    with BuildSketch(Plane(origin=(99.3451423, 10.5, -62.9075965), x_dir=(0, 0, 1), z_dir=(-1, 0, 0)), Plane(origin=(-3.9048577, 10.5, 5.2424035), x_dir=(0, 0, -1), z_dir=(1, 0, 0))) as fillet3_piece_18:
        with BuildLine():
            CenterArc((FILLET3_R, -FILLET3_R), FILLET3_R, 90, 90)
            Line((0, -FILLET3_R), (0, 0))
            Line((0, 0), (FILLET3_R, 0))
        make_face()
    extrude(amount=103.25, mode=Mode.SUBTRACT)
    with BuildSketch(Plane(origin=(100.3451423, 10.5, 4.2424035), x_dir=(-1, 0, 0), z_dir=(0, 0, -1)), Plane(origin=(-4.9048577, 10.5, -61.9075965), x_dir=(1, 0, 0), z_dir=(0, 0, 1))) as fillet3_piece_19:
        with BuildLine():
            CenterArc((FILLET3_R, -FILLET3_R), FILLET3_R, 90, 90)
            Line((0, -FILLET3_R), (0, 0))
            Line((0, 0), (FILLET3_R, 0))
        make_face()
    extrude(amount=66.15, mode=Mode.SUBTRACT)
    with BuildSketch(Plane(origin=(-3.9048577, 10.5, -61.9075965), x_dir=(0, 0, -1), z_dir=(1, 0, 0))) as fillet3_piece_20:
        with BuildLine():
            CenterArc((1 - FILLET3_R, -FILLET3_R), FILLET3_R, 0, 90)
            Line((1, -FILLET3_R), (1, 0))
            Line((1, 0), (1 - FILLET3_R, 0))
        make_face()
    revolve(axis=Axis((-3.9048577, 10.5, -61.9075965), (0, 1, 0)), revolution_arc=90, mode=Mode.SUBTRACT)
    with BuildSketch(Plane(origin=(-3.9048577, 10.5, 4.2424035), x_dir=(0, 0, 1), z_dir=(1, 0, 0))) as fillet3_piece_21:
        with BuildLine():
            CenterArc((1 - FILLET3_R, FILLET3_R), FILLET3_R, 270, 90)
            Line((1, FILLET3_R), (1, 0))
            Line((1, 0), (1 - FILLET3_R, 0))
        make_face()
    revolve(axis=Axis((-3.9048577, 10.5, 4.2424035), (0, -1, 0)), revolution_arc=90, mode=Mode.SUBTRACT)
    with BuildSketch(Plane(origin=(99.3451423, 10.5, 4.2424035), x_dir=(1, 0, 0), z_dir=(0, 0, -1))) as fillet3_piece_22:
        with BuildLine():
            CenterArc((1 - FILLET3_R, FILLET3_R), FILLET3_R, 270, 90)
            Line((1, FILLET3_R), (1, 0))
            Line((1, 0), (1 - FILLET3_R, 0))
        make_face()
    revolve(axis=Axis((99.3451423, 10.5, 4.2424035), (0, -1, 0)), revolution_arc=90, mode=Mode.SUBTRACT)
    with BuildSketch(Plane(origin=(99.3451423, 10.5, -61.9075965), x_dir=(1, 0, 0), z_dir=(0, 0, 1))) as fillet3_piece_23:
        with BuildLine():
            CenterArc((1 - FILLET3_R, -FILLET3_R), FILLET3_R, 0, 90)
            Line((1, -FILLET3_R), (1, 0))
            Line((1, 0), (1 - FILLET3_R, 0))
        make_face()
    revolve(axis=Axis((99.3451423, 10.5, -61.9075965), (0, 1, 0)), revolution_arc=90, mode=Mode.SUBTRACT)


solid = part.part
